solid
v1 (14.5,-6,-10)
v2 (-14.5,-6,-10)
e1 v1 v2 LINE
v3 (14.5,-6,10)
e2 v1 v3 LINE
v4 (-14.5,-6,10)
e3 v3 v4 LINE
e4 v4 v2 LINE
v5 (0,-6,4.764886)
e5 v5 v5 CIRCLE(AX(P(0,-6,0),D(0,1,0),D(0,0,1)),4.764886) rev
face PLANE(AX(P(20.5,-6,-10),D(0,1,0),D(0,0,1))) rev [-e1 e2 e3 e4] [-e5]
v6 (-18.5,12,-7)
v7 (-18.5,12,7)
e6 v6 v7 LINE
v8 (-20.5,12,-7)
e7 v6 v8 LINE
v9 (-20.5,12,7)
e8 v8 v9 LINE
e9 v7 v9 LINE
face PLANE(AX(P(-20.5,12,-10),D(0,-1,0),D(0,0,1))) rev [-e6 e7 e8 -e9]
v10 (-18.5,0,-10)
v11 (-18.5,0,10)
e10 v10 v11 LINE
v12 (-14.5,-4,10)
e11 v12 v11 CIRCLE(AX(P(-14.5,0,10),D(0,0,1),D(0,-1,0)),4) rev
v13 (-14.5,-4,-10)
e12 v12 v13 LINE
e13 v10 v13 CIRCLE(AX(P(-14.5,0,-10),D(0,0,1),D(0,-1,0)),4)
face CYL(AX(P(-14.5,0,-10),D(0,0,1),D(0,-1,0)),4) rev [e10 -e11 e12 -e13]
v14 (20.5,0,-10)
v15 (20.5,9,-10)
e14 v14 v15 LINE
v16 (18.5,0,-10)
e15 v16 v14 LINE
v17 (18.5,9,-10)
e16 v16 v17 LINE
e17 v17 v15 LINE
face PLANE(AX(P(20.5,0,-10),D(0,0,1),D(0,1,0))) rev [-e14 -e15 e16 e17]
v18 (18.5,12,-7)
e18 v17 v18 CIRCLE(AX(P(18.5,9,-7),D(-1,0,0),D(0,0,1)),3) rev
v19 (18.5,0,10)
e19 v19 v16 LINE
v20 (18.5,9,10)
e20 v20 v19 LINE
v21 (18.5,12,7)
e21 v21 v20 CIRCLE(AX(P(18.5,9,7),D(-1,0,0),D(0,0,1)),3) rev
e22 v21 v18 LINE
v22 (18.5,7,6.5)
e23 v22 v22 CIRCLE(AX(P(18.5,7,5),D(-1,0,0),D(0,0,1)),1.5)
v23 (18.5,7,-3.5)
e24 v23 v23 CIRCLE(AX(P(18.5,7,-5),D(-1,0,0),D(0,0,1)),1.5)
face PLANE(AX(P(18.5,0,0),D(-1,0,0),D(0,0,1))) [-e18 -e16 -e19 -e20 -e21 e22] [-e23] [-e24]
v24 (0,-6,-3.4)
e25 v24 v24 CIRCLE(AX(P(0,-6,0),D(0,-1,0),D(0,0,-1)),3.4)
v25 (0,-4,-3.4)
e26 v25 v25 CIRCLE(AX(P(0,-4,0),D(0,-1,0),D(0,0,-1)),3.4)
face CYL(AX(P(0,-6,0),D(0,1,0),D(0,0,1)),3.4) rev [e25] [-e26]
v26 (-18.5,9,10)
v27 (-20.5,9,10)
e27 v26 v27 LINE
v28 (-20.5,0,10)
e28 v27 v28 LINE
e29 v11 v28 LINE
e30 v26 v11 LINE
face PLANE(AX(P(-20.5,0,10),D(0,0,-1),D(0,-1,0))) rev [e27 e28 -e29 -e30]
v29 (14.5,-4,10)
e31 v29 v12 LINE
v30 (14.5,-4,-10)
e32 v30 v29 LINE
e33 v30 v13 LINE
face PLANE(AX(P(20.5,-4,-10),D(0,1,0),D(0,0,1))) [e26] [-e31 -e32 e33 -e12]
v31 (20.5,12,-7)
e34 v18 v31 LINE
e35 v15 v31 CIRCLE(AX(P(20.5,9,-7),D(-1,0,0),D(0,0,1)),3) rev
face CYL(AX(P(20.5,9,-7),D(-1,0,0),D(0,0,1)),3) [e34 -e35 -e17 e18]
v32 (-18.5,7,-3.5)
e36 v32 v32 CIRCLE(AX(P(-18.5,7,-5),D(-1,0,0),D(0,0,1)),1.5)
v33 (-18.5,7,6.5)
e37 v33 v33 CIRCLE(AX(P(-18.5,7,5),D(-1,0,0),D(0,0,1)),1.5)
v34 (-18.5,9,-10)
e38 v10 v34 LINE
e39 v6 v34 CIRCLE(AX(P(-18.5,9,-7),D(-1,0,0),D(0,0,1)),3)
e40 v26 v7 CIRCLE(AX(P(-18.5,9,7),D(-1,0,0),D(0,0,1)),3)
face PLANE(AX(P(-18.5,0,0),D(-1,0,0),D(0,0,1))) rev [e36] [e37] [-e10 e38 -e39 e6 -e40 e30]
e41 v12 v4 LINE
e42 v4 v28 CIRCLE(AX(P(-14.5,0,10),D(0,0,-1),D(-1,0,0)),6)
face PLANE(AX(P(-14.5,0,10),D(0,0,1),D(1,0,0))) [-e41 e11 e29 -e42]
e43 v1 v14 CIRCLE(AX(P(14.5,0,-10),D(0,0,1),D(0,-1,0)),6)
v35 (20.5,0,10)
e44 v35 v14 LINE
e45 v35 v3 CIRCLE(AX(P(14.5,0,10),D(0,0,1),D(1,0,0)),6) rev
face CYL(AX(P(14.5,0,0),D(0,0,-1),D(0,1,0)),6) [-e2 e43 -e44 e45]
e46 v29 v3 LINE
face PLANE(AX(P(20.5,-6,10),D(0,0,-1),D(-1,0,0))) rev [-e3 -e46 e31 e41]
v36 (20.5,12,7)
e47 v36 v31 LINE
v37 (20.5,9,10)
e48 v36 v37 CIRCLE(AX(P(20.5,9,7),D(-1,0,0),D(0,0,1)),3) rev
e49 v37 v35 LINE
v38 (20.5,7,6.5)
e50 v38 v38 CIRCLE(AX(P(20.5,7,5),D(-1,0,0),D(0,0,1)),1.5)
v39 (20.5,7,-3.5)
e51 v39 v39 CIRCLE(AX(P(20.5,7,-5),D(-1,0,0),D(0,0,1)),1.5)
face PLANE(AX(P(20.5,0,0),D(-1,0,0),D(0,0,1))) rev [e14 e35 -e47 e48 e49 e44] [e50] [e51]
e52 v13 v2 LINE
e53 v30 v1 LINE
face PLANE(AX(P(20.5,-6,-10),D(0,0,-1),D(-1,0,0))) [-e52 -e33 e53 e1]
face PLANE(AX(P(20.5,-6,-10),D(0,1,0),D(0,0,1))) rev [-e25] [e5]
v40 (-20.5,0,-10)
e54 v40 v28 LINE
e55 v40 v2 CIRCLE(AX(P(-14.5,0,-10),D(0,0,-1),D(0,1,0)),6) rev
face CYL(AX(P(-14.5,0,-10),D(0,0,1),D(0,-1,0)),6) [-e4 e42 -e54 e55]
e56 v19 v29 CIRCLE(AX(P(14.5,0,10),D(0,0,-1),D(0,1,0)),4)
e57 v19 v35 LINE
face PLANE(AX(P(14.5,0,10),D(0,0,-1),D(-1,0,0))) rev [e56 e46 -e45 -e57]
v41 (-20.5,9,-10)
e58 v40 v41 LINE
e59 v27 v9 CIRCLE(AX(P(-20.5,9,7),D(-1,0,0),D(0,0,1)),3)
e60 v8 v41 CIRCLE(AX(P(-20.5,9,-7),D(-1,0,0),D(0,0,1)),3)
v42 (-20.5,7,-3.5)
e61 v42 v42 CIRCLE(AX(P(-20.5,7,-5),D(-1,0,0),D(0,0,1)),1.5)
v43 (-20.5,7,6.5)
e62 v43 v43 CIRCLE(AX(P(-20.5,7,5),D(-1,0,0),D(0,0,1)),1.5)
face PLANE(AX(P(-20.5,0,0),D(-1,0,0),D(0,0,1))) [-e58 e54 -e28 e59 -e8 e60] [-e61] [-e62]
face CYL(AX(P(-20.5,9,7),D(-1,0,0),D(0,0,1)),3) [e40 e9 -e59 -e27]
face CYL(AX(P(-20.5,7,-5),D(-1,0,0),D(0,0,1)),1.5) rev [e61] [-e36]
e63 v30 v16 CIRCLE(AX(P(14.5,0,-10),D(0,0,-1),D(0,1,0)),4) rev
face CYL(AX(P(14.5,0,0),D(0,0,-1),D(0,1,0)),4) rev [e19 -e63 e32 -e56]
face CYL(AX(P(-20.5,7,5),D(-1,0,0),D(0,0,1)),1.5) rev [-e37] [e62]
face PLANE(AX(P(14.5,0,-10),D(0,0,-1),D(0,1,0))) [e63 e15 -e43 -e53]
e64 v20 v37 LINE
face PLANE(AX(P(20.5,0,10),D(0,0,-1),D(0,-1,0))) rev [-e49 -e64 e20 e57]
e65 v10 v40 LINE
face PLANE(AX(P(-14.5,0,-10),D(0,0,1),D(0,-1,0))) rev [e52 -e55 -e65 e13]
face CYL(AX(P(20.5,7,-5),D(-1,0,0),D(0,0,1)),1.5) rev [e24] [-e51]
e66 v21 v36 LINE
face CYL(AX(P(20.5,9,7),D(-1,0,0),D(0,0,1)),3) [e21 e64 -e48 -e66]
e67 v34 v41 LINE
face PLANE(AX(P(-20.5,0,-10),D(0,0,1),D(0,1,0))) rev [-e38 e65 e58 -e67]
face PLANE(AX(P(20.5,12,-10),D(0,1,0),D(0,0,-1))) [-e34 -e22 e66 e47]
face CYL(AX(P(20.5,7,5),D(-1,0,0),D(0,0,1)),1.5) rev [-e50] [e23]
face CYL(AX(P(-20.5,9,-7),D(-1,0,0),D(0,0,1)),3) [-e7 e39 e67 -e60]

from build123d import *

# Parameters (mm, degrees)
SKETCH1_W            = 20
SKETCH1_H            = 6
BOSS_EXTRUDE1_DEPTH  = 20.5
SKETCH2_W            = 3
SKETCH2_H            = 20
BOSS_EXTRUDE2_DEPTH  = 12
SKETCH7_R            = 1.5
CUT_EXTRUDE1_DEPTH   = 44.874821937
SKETCH8_R            = 3.4
CUT_EXTRUDE2_DEPTH   = 30.055980452
FILLET2_R            = 3
CONVERT_SOLID2_START = -10
CONVERT_SOLID2_DEPTH = 20


# Read off the part's stored shape, not the designer's step: Convert-Solid2
with BuildPart() as part:
    # Sketch1 → Boss-Extrude1 (new, symmetric)
    with BuildSketch(Plane(origin=(0, 0, 0), x_dir=(0, 0, -1), z_dir=(1, 0, 0))):
        with Locations((0, -3)):
            Rectangle(SKETCH1_W, SKETCH1_H)
    extrude(amount=BOSS_EXTRUDE1_DEPTH, both=True)

    # Sketch2 → Boss-Extrude2 (add)
    with BuildSketch(Plane(origin=(0, 0, 0), x_dir=(1, 0, 0), z_dir=(0, 1, 0))):
        with Locations((19, 0)):
            Rectangle(SKETCH2_W, SKETCH2_H)
        with Locations((-19, 0)):
            Rectangle(SKETCH2_W, SKETCH2_H)
    extrude(amount=BOSS_EXTRUDE2_DEPTH)

    # Sketch7 → Cut-Extrude1 (cut, through all)
    with BuildSketch(Plane.ZY.offset(20.5)):
        with Locations((-5, 7)):
            Circle(SKETCH7_R)
        with Locations((5, 7)):
            Circle(SKETCH7_R)
    extrude(amount=-CUT_EXTRUDE1_DEPTH, mode=Mode.SUBTRACT)

    # Sketch8 → Cut-Extrude2 (cut, through all)
    with BuildSketch(Plane.XZ.offset(6)):
        with Locations(Location((0, 0, 0), (0, 0, 270))):
            Circle(SKETCH8_R)
    extrude(amount=-CUT_EXTRUDE2_DEPTH, mode=Mode.SUBTRACT)

    # Fillet2
    fillet2_edges = [part.edges().sort_by_distance(p)[0] for p in [
        (-19, 12, 10),
        (-19, 12, -10),
        (19, 12, -10),
        (19, 12, 10),
    ]]
    fillet(fillet2_edges, radius=FILLET2_R)

    # Convert-Solid2 outline → Convert-Solid2 (cut)
    with BuildSketch(Plane.XY.offset(CONVERT_SOLID2_START)):
        with BuildLine():
            Line((20.5, -6), (20.5, 0))
            ThreePointArc((20.5, 0), (18.742640687, -4.242640687), (14.5, -6))
            Line((14.5, -6), (20.5, -6))
        make_face()
        with BuildLine():
            Line((-20.5, -6), (-14.5, -6))
            ThreePointArc((-14.5, -6), (-18.742640687, -4.242640687), (-20.5, 0))
            Line((-20.5, 0), (-20.5, -6))
        make_face()
        with BuildLine():
            Line((18.5, 0), (18.5, 12))
            Line((18.5, 12), (17.5, 12))
            Line((17.5, 12), (17.5, 0))
            Line((17.5, 0), (-17.5, 0))
            Line((-17.5, 0), (-17.5, 12))
            Line((-17.5, 12), (-18.5, 12))
            Line((-18.5, 12), (-18.5, 0))
            ThreePointArc((-18.5, 0), (-17.328427125, -2.828427125), (-14.5, -4))
            Line((-14.5, -4), (14.5, -4))
            ThreePointArc((14.5, -4), (17.328427125, -2.828427125), (18.5, 0))
        make_face()
    extrude(amount=CONVERT_SOLID2_DEPTH, mode=Mode.SUBTRACT)


solid = part.part
